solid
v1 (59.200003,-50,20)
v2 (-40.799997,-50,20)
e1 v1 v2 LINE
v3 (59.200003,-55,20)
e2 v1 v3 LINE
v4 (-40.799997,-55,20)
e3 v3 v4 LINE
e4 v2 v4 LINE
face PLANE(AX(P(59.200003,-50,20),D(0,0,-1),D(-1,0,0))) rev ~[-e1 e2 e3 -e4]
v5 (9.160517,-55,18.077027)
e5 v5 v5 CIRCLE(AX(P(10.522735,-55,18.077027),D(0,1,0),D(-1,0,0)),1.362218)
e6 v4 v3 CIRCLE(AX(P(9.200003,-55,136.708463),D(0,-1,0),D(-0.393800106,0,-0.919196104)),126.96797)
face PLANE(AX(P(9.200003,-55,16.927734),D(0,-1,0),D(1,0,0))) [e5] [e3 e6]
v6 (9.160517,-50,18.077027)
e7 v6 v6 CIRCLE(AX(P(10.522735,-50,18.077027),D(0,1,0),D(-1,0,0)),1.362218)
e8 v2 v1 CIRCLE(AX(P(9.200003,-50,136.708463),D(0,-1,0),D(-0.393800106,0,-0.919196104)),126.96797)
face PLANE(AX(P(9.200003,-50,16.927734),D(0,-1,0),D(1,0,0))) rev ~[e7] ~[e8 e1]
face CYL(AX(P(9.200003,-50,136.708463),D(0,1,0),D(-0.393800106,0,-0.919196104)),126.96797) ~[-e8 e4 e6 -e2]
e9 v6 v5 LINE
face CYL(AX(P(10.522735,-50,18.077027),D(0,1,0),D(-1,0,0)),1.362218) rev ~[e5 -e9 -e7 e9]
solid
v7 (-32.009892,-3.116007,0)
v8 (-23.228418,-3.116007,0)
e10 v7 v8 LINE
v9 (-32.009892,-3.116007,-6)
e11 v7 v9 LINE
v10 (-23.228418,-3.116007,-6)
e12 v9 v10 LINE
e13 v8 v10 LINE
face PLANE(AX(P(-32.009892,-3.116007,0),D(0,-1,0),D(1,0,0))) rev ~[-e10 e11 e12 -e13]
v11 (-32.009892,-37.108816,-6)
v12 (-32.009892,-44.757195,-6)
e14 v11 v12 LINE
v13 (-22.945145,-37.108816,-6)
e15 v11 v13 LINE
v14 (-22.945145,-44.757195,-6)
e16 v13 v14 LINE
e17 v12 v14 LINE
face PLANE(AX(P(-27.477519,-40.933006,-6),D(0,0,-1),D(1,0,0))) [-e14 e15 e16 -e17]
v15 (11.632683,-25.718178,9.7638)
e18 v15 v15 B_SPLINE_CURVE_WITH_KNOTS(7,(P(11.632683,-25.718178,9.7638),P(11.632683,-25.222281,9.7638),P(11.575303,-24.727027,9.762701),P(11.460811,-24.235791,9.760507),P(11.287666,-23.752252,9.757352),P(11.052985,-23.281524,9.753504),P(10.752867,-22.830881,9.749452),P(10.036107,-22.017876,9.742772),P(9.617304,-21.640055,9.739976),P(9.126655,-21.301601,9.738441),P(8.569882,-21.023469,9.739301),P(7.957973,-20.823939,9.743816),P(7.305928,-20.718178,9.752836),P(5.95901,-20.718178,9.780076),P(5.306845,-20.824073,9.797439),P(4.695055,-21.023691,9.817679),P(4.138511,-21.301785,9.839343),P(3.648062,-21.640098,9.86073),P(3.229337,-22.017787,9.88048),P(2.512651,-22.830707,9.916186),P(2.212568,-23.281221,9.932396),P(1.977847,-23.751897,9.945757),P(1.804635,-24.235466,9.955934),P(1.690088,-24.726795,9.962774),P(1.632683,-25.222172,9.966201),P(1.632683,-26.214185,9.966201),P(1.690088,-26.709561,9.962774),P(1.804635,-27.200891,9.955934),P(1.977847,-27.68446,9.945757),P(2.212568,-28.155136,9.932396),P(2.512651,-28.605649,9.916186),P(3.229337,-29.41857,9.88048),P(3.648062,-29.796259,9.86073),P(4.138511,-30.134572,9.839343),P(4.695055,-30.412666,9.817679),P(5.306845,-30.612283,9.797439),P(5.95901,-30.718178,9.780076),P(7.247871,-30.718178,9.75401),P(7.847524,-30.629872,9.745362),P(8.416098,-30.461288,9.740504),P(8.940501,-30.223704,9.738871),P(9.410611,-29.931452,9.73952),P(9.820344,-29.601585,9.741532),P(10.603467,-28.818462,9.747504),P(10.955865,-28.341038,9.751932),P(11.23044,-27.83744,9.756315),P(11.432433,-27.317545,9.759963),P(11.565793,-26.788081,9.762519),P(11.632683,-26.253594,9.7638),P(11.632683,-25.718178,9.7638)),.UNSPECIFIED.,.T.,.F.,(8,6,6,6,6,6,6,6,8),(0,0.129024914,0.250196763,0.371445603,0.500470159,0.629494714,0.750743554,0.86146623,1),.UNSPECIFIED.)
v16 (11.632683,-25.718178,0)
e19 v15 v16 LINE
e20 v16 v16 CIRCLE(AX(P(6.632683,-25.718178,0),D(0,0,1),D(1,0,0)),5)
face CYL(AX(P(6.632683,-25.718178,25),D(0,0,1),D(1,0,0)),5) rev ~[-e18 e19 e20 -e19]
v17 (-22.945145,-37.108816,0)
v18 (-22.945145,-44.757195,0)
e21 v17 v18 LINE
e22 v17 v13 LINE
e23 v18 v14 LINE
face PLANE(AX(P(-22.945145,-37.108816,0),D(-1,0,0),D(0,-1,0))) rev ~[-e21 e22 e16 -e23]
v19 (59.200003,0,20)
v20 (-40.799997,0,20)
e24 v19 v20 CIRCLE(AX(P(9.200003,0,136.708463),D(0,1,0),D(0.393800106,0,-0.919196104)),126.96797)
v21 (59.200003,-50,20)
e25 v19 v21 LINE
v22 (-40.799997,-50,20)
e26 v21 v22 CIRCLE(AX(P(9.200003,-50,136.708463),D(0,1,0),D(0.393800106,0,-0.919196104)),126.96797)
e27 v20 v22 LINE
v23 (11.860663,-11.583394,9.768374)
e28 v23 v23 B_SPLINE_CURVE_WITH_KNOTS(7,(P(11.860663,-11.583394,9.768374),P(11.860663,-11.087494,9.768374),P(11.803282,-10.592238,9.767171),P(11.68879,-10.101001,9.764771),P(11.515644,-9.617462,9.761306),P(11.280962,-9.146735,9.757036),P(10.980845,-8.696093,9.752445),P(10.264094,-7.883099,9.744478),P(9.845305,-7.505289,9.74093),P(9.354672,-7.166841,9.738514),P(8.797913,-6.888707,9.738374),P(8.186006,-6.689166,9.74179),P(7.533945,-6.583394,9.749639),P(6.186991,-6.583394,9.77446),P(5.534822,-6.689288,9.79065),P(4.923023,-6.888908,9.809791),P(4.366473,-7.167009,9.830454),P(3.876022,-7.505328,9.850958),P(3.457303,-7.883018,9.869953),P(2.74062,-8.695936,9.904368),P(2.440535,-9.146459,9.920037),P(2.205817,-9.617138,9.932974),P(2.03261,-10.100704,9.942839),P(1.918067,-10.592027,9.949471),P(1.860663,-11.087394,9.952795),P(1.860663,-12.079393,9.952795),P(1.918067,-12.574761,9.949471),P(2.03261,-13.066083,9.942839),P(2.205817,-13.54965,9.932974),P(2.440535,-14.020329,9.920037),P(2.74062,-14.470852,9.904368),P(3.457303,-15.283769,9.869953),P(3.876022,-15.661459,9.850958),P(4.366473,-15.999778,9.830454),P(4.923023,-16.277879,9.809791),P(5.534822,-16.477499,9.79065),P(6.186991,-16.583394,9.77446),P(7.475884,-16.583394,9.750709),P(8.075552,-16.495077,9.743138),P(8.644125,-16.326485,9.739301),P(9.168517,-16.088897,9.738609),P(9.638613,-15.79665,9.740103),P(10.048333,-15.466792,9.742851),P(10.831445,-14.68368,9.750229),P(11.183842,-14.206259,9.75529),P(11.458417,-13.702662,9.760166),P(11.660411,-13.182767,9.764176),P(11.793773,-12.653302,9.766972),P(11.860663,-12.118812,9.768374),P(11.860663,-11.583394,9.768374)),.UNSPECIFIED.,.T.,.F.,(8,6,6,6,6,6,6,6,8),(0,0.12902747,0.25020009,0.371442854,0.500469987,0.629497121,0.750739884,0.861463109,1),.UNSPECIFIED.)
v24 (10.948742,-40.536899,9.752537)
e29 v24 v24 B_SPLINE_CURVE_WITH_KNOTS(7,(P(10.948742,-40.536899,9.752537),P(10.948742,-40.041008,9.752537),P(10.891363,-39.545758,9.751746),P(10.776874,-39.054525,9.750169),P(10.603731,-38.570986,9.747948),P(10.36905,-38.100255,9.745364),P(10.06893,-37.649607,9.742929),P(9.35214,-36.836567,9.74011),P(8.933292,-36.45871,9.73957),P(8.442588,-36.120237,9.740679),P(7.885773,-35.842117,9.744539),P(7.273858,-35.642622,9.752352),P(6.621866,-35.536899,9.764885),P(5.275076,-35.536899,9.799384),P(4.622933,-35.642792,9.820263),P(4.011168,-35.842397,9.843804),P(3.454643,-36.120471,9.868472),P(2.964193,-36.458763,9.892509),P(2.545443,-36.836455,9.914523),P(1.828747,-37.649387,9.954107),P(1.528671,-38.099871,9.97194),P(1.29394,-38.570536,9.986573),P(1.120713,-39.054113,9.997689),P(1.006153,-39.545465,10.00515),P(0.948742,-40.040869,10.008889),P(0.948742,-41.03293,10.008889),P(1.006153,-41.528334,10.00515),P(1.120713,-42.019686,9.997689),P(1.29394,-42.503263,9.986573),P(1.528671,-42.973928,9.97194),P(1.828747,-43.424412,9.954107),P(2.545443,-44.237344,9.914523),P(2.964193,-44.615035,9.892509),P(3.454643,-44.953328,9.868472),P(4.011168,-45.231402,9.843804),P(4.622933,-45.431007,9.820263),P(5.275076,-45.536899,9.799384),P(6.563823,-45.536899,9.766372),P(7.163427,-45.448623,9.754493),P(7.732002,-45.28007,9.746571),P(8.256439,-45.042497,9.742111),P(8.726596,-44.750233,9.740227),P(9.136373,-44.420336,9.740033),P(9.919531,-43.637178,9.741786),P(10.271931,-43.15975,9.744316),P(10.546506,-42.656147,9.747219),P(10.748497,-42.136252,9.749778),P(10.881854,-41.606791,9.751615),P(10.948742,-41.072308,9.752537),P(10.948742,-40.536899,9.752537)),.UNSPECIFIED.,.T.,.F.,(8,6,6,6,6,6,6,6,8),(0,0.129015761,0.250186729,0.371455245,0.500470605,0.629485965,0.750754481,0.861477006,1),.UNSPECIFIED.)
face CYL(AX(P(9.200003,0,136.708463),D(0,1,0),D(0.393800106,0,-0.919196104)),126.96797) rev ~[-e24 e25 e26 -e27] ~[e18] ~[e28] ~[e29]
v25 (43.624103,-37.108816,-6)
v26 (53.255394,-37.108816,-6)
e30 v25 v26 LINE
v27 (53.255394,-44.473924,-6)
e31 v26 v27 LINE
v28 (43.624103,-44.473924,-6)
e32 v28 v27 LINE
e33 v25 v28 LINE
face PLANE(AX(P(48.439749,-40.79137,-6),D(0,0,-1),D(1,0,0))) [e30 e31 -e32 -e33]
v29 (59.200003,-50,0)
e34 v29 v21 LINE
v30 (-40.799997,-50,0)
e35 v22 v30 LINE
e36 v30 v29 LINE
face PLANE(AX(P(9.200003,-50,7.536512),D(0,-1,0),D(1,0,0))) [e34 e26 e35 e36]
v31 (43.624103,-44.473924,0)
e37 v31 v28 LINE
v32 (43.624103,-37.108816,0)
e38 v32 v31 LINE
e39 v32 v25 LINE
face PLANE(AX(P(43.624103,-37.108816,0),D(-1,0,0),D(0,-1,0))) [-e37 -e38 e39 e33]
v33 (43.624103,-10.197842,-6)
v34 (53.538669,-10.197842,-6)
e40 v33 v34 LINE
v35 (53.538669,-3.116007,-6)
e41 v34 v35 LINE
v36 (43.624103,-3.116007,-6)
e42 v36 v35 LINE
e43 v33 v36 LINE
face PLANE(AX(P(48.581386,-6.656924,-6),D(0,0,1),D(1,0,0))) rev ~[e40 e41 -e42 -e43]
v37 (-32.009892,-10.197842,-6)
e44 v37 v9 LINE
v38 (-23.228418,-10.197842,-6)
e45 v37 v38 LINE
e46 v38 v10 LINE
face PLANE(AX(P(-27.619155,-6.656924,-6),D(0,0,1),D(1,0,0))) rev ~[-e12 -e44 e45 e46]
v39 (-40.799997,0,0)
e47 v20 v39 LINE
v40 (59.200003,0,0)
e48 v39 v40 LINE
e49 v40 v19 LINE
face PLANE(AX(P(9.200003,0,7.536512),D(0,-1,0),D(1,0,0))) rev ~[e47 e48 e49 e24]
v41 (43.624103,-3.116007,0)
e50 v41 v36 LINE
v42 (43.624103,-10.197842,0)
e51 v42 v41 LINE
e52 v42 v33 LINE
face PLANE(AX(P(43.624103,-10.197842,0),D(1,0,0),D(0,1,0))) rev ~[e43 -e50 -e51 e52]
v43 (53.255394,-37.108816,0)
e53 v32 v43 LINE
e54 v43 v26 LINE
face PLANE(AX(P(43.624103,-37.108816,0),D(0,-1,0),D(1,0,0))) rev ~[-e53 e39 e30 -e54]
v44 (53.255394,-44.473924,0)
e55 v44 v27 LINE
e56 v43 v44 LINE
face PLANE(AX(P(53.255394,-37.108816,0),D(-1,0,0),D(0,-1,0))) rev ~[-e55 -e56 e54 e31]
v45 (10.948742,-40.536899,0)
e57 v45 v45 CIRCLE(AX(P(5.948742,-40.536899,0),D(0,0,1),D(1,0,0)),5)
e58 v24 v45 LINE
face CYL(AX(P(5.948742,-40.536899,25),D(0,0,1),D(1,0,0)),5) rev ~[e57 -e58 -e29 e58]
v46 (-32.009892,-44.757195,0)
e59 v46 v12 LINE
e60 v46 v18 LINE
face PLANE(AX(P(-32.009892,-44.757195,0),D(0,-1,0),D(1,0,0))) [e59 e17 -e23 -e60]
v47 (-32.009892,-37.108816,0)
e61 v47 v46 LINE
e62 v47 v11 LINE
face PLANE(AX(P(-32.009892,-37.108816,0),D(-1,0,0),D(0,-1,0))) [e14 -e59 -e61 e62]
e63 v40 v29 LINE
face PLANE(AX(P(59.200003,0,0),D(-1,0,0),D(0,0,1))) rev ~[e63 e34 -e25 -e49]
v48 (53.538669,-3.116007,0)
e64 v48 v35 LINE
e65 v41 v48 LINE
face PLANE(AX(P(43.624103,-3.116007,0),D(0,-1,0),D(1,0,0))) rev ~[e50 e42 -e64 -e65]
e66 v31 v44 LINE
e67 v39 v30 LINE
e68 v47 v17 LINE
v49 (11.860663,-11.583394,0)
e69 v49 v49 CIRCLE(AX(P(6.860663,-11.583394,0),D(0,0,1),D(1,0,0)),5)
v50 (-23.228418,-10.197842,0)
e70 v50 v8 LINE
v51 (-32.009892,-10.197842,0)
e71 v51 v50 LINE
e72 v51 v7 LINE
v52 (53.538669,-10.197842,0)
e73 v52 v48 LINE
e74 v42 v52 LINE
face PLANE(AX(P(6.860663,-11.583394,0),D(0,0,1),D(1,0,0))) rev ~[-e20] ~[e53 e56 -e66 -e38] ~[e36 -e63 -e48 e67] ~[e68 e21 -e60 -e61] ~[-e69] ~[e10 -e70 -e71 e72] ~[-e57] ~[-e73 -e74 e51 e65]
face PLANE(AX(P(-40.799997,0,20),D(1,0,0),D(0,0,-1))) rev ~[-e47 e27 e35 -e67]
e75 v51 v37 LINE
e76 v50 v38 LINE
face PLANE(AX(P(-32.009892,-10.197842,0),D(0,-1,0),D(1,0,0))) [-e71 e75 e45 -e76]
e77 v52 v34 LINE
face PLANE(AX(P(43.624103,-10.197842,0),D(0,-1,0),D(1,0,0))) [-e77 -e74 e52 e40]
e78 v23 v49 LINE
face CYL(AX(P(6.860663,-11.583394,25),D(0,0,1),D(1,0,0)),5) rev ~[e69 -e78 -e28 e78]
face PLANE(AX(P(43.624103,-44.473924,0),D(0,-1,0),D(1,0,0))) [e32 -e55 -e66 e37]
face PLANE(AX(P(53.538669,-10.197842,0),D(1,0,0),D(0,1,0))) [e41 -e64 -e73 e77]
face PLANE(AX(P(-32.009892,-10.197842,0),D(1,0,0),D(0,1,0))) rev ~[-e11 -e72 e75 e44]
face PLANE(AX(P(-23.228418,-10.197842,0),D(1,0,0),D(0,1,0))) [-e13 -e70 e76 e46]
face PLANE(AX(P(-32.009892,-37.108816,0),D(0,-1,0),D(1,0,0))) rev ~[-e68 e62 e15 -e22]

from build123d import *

# Parameters (mm, degrees)
F1_DEPTH  = 50
F2_R      = 5
F3_DEPTH  = 25
F3_FACE_R = 5
F4_DEPTH  = 143
F5_DEPTH  = 25.0010001
F6_W      = 7.0818345994
F6_H      = 5.9487447143
F7_DEPTH  = 6
F6_W_2    = 9.9145658314
F6_H_2    = 7.0818341337
F6_W_3    = 8.7814740837
F11_DEPTH = 5
F12_R     = 1.2416871231
F13_DEPTH = 146
F14_R     = 1.3622183524
F15_DEPTH = 33.4
F16_W     = 9.0647470206
F16_H     = 7.6483786106
F16_W_2   = 9.6312910318
F16_H_2   = 7.3651075363
F17_DEPTH = 6


# Not quite as in the source:
# - an extrude ends at something that could not be found from the text; its depth is read off the source's solid


with BuildPart() as f1:
    # F0 (on Front) → F1 (new body)
    with BuildSketch(Plane.XZ):
        with BuildLine():
            Line((-40.7999969139, 20), (-40.7999969139, 0))
            Line((-40.7999969139, 0), (59.2000030861, 0))
            Line((59.2000030861, 0), (59.2000030861, 20))
            ThreePointArc((59.2000030861, 20), (9.2000030861, 9.7404933021), (-40.7999969139, 20))
        make_face()
    extrude(amount=F1_DEPTH)

    # F2 (on Top) → F3 (join)
    with BuildSketch(Plane.XY):
        with Locations((6.8606630445, -11.5833937097)):
            Circle(F2_R)
        with Locations((6.6326826697, -25.7181784424)):
            Circle(F2_R)
        with Locations((5.9487419203, -40.5368994273)):
            Circle(F2_R)
    extrude(amount=F3_DEPTH)

    # F2 (on Top) + F3_face (on face) → F4 (cut, through all)
    with BuildSketch(Plane.XY):
        with Locations((6.8606630445, -11.5833937097)):
            Circle(F2_R)
        with Locations((6.6326826697, -25.7181784424)):
            Circle(F2_R)
        with Locations((5.9487419203, -40.5368994273)):
            Circle(F2_R)
    with BuildSketch(Plane(origin=(6.6326826697, -25.7181784424, 25), x_dir=(1, 0, 0), z_dir=(0, 0, 1))):
        Circle(F3_FACE_R)
        with Locations((-0.6839407494, -14.8187209849)):
            Circle(F3_FACE_R)
    extrude(amount=-F4_DEPTH, mode=Mode.SUBTRACT)

    # F5 (cut, through all): a face of the model
    f5_faces = [f1.faces().sort_by_distance(p)[0] for p in [
        (6.8606630445, -11.5833937097, 25),
    ]]
    extrude(f5_faces, amount=-F5_DEPTH, mode=Mode.SUBTRACT)

    # F6 (on Top) → F7, piece 3 (join)
    with BuildSketch(Plane.XY):
        with Locations((48.581385985, -6.6569244955)):
            Rectangle(F6_W_2, F6_H_2)
        with Locations((-27.6191551238, -6.6569244955)):
            Rectangle(F6_W_3, F6_H_2)
    extrude(amount=-F7_DEPTH)

    # F12 (on Front) → F13 (cut, through all)
    with BuildSketch(Plane.XZ):
        with Locations((3.8911467418, 17.7770014852)):
            Circle(F12_R)
    extrude(amount=-F13_DEPTH, mode=Mode.SUBTRACT)

    # F16 (on face) → F17 (join)
    with BuildSketch(Plane(origin=(0, 0, 0), x_dir=(1, 0, 0), z_dir=(0, 0, -1))):
        with Locations((-27.4775186554, 40.9330055118)):
            Rectangle(F16_W, F16_H)
        with Locations((48.4397485852, 40.7913699746)):
            Rectangle(F16_W_2, F16_H_2)
    extrude(amount=F17_DEPTH)


with BuildPart() as f7:
    # F6 (on Top) → F7 (new body)
    with BuildSketch(Plane.XY):
        with Locations((-26.7693353817, -55.3799495101)):
            Rectangle(F6_W, F6_H)
    extrude(amount=-F7_DEPTH)


with BuildPart() as f7b:
    # F6 (on Top) → F7, piece 2 (new body)
    with BuildSketch(Plane.XY):
        with Locations((48.581385985, -55.3799495101)):
            Rectangle(F6_W_2, F6_H)
    extrude(amount=-F7_DEPTH)


with BuildPart() as f11:
    # F10 (on face) → F11 (new body)
    with BuildSketch(Plane.XZ.offset(50)):
        with BuildLine():
            Line((59.2000030861, 20), (-40.7999969139, 20))
            ThreePointArc((-40.7999969139, 20), (9.2000030861, 9.7404933021), (59.2000030861, 20))
        make_face()
    extrude(amount=F11_DEPTH)

    # F14 (on face) → F15 (cut)
    with BuildSketch(Plane(origin=(0, -50, 0), x_dir=(-1, 0, 0), z_dir=(0, 1, 0))):
        with Locations((-10.5227353051, 18.0770270526)):
            Circle(F14_R)
    extrude(amount=-F15_DEPTH, mode=Mode.SUBTRACT)


solid = Compound([f1.part, f11.part])
